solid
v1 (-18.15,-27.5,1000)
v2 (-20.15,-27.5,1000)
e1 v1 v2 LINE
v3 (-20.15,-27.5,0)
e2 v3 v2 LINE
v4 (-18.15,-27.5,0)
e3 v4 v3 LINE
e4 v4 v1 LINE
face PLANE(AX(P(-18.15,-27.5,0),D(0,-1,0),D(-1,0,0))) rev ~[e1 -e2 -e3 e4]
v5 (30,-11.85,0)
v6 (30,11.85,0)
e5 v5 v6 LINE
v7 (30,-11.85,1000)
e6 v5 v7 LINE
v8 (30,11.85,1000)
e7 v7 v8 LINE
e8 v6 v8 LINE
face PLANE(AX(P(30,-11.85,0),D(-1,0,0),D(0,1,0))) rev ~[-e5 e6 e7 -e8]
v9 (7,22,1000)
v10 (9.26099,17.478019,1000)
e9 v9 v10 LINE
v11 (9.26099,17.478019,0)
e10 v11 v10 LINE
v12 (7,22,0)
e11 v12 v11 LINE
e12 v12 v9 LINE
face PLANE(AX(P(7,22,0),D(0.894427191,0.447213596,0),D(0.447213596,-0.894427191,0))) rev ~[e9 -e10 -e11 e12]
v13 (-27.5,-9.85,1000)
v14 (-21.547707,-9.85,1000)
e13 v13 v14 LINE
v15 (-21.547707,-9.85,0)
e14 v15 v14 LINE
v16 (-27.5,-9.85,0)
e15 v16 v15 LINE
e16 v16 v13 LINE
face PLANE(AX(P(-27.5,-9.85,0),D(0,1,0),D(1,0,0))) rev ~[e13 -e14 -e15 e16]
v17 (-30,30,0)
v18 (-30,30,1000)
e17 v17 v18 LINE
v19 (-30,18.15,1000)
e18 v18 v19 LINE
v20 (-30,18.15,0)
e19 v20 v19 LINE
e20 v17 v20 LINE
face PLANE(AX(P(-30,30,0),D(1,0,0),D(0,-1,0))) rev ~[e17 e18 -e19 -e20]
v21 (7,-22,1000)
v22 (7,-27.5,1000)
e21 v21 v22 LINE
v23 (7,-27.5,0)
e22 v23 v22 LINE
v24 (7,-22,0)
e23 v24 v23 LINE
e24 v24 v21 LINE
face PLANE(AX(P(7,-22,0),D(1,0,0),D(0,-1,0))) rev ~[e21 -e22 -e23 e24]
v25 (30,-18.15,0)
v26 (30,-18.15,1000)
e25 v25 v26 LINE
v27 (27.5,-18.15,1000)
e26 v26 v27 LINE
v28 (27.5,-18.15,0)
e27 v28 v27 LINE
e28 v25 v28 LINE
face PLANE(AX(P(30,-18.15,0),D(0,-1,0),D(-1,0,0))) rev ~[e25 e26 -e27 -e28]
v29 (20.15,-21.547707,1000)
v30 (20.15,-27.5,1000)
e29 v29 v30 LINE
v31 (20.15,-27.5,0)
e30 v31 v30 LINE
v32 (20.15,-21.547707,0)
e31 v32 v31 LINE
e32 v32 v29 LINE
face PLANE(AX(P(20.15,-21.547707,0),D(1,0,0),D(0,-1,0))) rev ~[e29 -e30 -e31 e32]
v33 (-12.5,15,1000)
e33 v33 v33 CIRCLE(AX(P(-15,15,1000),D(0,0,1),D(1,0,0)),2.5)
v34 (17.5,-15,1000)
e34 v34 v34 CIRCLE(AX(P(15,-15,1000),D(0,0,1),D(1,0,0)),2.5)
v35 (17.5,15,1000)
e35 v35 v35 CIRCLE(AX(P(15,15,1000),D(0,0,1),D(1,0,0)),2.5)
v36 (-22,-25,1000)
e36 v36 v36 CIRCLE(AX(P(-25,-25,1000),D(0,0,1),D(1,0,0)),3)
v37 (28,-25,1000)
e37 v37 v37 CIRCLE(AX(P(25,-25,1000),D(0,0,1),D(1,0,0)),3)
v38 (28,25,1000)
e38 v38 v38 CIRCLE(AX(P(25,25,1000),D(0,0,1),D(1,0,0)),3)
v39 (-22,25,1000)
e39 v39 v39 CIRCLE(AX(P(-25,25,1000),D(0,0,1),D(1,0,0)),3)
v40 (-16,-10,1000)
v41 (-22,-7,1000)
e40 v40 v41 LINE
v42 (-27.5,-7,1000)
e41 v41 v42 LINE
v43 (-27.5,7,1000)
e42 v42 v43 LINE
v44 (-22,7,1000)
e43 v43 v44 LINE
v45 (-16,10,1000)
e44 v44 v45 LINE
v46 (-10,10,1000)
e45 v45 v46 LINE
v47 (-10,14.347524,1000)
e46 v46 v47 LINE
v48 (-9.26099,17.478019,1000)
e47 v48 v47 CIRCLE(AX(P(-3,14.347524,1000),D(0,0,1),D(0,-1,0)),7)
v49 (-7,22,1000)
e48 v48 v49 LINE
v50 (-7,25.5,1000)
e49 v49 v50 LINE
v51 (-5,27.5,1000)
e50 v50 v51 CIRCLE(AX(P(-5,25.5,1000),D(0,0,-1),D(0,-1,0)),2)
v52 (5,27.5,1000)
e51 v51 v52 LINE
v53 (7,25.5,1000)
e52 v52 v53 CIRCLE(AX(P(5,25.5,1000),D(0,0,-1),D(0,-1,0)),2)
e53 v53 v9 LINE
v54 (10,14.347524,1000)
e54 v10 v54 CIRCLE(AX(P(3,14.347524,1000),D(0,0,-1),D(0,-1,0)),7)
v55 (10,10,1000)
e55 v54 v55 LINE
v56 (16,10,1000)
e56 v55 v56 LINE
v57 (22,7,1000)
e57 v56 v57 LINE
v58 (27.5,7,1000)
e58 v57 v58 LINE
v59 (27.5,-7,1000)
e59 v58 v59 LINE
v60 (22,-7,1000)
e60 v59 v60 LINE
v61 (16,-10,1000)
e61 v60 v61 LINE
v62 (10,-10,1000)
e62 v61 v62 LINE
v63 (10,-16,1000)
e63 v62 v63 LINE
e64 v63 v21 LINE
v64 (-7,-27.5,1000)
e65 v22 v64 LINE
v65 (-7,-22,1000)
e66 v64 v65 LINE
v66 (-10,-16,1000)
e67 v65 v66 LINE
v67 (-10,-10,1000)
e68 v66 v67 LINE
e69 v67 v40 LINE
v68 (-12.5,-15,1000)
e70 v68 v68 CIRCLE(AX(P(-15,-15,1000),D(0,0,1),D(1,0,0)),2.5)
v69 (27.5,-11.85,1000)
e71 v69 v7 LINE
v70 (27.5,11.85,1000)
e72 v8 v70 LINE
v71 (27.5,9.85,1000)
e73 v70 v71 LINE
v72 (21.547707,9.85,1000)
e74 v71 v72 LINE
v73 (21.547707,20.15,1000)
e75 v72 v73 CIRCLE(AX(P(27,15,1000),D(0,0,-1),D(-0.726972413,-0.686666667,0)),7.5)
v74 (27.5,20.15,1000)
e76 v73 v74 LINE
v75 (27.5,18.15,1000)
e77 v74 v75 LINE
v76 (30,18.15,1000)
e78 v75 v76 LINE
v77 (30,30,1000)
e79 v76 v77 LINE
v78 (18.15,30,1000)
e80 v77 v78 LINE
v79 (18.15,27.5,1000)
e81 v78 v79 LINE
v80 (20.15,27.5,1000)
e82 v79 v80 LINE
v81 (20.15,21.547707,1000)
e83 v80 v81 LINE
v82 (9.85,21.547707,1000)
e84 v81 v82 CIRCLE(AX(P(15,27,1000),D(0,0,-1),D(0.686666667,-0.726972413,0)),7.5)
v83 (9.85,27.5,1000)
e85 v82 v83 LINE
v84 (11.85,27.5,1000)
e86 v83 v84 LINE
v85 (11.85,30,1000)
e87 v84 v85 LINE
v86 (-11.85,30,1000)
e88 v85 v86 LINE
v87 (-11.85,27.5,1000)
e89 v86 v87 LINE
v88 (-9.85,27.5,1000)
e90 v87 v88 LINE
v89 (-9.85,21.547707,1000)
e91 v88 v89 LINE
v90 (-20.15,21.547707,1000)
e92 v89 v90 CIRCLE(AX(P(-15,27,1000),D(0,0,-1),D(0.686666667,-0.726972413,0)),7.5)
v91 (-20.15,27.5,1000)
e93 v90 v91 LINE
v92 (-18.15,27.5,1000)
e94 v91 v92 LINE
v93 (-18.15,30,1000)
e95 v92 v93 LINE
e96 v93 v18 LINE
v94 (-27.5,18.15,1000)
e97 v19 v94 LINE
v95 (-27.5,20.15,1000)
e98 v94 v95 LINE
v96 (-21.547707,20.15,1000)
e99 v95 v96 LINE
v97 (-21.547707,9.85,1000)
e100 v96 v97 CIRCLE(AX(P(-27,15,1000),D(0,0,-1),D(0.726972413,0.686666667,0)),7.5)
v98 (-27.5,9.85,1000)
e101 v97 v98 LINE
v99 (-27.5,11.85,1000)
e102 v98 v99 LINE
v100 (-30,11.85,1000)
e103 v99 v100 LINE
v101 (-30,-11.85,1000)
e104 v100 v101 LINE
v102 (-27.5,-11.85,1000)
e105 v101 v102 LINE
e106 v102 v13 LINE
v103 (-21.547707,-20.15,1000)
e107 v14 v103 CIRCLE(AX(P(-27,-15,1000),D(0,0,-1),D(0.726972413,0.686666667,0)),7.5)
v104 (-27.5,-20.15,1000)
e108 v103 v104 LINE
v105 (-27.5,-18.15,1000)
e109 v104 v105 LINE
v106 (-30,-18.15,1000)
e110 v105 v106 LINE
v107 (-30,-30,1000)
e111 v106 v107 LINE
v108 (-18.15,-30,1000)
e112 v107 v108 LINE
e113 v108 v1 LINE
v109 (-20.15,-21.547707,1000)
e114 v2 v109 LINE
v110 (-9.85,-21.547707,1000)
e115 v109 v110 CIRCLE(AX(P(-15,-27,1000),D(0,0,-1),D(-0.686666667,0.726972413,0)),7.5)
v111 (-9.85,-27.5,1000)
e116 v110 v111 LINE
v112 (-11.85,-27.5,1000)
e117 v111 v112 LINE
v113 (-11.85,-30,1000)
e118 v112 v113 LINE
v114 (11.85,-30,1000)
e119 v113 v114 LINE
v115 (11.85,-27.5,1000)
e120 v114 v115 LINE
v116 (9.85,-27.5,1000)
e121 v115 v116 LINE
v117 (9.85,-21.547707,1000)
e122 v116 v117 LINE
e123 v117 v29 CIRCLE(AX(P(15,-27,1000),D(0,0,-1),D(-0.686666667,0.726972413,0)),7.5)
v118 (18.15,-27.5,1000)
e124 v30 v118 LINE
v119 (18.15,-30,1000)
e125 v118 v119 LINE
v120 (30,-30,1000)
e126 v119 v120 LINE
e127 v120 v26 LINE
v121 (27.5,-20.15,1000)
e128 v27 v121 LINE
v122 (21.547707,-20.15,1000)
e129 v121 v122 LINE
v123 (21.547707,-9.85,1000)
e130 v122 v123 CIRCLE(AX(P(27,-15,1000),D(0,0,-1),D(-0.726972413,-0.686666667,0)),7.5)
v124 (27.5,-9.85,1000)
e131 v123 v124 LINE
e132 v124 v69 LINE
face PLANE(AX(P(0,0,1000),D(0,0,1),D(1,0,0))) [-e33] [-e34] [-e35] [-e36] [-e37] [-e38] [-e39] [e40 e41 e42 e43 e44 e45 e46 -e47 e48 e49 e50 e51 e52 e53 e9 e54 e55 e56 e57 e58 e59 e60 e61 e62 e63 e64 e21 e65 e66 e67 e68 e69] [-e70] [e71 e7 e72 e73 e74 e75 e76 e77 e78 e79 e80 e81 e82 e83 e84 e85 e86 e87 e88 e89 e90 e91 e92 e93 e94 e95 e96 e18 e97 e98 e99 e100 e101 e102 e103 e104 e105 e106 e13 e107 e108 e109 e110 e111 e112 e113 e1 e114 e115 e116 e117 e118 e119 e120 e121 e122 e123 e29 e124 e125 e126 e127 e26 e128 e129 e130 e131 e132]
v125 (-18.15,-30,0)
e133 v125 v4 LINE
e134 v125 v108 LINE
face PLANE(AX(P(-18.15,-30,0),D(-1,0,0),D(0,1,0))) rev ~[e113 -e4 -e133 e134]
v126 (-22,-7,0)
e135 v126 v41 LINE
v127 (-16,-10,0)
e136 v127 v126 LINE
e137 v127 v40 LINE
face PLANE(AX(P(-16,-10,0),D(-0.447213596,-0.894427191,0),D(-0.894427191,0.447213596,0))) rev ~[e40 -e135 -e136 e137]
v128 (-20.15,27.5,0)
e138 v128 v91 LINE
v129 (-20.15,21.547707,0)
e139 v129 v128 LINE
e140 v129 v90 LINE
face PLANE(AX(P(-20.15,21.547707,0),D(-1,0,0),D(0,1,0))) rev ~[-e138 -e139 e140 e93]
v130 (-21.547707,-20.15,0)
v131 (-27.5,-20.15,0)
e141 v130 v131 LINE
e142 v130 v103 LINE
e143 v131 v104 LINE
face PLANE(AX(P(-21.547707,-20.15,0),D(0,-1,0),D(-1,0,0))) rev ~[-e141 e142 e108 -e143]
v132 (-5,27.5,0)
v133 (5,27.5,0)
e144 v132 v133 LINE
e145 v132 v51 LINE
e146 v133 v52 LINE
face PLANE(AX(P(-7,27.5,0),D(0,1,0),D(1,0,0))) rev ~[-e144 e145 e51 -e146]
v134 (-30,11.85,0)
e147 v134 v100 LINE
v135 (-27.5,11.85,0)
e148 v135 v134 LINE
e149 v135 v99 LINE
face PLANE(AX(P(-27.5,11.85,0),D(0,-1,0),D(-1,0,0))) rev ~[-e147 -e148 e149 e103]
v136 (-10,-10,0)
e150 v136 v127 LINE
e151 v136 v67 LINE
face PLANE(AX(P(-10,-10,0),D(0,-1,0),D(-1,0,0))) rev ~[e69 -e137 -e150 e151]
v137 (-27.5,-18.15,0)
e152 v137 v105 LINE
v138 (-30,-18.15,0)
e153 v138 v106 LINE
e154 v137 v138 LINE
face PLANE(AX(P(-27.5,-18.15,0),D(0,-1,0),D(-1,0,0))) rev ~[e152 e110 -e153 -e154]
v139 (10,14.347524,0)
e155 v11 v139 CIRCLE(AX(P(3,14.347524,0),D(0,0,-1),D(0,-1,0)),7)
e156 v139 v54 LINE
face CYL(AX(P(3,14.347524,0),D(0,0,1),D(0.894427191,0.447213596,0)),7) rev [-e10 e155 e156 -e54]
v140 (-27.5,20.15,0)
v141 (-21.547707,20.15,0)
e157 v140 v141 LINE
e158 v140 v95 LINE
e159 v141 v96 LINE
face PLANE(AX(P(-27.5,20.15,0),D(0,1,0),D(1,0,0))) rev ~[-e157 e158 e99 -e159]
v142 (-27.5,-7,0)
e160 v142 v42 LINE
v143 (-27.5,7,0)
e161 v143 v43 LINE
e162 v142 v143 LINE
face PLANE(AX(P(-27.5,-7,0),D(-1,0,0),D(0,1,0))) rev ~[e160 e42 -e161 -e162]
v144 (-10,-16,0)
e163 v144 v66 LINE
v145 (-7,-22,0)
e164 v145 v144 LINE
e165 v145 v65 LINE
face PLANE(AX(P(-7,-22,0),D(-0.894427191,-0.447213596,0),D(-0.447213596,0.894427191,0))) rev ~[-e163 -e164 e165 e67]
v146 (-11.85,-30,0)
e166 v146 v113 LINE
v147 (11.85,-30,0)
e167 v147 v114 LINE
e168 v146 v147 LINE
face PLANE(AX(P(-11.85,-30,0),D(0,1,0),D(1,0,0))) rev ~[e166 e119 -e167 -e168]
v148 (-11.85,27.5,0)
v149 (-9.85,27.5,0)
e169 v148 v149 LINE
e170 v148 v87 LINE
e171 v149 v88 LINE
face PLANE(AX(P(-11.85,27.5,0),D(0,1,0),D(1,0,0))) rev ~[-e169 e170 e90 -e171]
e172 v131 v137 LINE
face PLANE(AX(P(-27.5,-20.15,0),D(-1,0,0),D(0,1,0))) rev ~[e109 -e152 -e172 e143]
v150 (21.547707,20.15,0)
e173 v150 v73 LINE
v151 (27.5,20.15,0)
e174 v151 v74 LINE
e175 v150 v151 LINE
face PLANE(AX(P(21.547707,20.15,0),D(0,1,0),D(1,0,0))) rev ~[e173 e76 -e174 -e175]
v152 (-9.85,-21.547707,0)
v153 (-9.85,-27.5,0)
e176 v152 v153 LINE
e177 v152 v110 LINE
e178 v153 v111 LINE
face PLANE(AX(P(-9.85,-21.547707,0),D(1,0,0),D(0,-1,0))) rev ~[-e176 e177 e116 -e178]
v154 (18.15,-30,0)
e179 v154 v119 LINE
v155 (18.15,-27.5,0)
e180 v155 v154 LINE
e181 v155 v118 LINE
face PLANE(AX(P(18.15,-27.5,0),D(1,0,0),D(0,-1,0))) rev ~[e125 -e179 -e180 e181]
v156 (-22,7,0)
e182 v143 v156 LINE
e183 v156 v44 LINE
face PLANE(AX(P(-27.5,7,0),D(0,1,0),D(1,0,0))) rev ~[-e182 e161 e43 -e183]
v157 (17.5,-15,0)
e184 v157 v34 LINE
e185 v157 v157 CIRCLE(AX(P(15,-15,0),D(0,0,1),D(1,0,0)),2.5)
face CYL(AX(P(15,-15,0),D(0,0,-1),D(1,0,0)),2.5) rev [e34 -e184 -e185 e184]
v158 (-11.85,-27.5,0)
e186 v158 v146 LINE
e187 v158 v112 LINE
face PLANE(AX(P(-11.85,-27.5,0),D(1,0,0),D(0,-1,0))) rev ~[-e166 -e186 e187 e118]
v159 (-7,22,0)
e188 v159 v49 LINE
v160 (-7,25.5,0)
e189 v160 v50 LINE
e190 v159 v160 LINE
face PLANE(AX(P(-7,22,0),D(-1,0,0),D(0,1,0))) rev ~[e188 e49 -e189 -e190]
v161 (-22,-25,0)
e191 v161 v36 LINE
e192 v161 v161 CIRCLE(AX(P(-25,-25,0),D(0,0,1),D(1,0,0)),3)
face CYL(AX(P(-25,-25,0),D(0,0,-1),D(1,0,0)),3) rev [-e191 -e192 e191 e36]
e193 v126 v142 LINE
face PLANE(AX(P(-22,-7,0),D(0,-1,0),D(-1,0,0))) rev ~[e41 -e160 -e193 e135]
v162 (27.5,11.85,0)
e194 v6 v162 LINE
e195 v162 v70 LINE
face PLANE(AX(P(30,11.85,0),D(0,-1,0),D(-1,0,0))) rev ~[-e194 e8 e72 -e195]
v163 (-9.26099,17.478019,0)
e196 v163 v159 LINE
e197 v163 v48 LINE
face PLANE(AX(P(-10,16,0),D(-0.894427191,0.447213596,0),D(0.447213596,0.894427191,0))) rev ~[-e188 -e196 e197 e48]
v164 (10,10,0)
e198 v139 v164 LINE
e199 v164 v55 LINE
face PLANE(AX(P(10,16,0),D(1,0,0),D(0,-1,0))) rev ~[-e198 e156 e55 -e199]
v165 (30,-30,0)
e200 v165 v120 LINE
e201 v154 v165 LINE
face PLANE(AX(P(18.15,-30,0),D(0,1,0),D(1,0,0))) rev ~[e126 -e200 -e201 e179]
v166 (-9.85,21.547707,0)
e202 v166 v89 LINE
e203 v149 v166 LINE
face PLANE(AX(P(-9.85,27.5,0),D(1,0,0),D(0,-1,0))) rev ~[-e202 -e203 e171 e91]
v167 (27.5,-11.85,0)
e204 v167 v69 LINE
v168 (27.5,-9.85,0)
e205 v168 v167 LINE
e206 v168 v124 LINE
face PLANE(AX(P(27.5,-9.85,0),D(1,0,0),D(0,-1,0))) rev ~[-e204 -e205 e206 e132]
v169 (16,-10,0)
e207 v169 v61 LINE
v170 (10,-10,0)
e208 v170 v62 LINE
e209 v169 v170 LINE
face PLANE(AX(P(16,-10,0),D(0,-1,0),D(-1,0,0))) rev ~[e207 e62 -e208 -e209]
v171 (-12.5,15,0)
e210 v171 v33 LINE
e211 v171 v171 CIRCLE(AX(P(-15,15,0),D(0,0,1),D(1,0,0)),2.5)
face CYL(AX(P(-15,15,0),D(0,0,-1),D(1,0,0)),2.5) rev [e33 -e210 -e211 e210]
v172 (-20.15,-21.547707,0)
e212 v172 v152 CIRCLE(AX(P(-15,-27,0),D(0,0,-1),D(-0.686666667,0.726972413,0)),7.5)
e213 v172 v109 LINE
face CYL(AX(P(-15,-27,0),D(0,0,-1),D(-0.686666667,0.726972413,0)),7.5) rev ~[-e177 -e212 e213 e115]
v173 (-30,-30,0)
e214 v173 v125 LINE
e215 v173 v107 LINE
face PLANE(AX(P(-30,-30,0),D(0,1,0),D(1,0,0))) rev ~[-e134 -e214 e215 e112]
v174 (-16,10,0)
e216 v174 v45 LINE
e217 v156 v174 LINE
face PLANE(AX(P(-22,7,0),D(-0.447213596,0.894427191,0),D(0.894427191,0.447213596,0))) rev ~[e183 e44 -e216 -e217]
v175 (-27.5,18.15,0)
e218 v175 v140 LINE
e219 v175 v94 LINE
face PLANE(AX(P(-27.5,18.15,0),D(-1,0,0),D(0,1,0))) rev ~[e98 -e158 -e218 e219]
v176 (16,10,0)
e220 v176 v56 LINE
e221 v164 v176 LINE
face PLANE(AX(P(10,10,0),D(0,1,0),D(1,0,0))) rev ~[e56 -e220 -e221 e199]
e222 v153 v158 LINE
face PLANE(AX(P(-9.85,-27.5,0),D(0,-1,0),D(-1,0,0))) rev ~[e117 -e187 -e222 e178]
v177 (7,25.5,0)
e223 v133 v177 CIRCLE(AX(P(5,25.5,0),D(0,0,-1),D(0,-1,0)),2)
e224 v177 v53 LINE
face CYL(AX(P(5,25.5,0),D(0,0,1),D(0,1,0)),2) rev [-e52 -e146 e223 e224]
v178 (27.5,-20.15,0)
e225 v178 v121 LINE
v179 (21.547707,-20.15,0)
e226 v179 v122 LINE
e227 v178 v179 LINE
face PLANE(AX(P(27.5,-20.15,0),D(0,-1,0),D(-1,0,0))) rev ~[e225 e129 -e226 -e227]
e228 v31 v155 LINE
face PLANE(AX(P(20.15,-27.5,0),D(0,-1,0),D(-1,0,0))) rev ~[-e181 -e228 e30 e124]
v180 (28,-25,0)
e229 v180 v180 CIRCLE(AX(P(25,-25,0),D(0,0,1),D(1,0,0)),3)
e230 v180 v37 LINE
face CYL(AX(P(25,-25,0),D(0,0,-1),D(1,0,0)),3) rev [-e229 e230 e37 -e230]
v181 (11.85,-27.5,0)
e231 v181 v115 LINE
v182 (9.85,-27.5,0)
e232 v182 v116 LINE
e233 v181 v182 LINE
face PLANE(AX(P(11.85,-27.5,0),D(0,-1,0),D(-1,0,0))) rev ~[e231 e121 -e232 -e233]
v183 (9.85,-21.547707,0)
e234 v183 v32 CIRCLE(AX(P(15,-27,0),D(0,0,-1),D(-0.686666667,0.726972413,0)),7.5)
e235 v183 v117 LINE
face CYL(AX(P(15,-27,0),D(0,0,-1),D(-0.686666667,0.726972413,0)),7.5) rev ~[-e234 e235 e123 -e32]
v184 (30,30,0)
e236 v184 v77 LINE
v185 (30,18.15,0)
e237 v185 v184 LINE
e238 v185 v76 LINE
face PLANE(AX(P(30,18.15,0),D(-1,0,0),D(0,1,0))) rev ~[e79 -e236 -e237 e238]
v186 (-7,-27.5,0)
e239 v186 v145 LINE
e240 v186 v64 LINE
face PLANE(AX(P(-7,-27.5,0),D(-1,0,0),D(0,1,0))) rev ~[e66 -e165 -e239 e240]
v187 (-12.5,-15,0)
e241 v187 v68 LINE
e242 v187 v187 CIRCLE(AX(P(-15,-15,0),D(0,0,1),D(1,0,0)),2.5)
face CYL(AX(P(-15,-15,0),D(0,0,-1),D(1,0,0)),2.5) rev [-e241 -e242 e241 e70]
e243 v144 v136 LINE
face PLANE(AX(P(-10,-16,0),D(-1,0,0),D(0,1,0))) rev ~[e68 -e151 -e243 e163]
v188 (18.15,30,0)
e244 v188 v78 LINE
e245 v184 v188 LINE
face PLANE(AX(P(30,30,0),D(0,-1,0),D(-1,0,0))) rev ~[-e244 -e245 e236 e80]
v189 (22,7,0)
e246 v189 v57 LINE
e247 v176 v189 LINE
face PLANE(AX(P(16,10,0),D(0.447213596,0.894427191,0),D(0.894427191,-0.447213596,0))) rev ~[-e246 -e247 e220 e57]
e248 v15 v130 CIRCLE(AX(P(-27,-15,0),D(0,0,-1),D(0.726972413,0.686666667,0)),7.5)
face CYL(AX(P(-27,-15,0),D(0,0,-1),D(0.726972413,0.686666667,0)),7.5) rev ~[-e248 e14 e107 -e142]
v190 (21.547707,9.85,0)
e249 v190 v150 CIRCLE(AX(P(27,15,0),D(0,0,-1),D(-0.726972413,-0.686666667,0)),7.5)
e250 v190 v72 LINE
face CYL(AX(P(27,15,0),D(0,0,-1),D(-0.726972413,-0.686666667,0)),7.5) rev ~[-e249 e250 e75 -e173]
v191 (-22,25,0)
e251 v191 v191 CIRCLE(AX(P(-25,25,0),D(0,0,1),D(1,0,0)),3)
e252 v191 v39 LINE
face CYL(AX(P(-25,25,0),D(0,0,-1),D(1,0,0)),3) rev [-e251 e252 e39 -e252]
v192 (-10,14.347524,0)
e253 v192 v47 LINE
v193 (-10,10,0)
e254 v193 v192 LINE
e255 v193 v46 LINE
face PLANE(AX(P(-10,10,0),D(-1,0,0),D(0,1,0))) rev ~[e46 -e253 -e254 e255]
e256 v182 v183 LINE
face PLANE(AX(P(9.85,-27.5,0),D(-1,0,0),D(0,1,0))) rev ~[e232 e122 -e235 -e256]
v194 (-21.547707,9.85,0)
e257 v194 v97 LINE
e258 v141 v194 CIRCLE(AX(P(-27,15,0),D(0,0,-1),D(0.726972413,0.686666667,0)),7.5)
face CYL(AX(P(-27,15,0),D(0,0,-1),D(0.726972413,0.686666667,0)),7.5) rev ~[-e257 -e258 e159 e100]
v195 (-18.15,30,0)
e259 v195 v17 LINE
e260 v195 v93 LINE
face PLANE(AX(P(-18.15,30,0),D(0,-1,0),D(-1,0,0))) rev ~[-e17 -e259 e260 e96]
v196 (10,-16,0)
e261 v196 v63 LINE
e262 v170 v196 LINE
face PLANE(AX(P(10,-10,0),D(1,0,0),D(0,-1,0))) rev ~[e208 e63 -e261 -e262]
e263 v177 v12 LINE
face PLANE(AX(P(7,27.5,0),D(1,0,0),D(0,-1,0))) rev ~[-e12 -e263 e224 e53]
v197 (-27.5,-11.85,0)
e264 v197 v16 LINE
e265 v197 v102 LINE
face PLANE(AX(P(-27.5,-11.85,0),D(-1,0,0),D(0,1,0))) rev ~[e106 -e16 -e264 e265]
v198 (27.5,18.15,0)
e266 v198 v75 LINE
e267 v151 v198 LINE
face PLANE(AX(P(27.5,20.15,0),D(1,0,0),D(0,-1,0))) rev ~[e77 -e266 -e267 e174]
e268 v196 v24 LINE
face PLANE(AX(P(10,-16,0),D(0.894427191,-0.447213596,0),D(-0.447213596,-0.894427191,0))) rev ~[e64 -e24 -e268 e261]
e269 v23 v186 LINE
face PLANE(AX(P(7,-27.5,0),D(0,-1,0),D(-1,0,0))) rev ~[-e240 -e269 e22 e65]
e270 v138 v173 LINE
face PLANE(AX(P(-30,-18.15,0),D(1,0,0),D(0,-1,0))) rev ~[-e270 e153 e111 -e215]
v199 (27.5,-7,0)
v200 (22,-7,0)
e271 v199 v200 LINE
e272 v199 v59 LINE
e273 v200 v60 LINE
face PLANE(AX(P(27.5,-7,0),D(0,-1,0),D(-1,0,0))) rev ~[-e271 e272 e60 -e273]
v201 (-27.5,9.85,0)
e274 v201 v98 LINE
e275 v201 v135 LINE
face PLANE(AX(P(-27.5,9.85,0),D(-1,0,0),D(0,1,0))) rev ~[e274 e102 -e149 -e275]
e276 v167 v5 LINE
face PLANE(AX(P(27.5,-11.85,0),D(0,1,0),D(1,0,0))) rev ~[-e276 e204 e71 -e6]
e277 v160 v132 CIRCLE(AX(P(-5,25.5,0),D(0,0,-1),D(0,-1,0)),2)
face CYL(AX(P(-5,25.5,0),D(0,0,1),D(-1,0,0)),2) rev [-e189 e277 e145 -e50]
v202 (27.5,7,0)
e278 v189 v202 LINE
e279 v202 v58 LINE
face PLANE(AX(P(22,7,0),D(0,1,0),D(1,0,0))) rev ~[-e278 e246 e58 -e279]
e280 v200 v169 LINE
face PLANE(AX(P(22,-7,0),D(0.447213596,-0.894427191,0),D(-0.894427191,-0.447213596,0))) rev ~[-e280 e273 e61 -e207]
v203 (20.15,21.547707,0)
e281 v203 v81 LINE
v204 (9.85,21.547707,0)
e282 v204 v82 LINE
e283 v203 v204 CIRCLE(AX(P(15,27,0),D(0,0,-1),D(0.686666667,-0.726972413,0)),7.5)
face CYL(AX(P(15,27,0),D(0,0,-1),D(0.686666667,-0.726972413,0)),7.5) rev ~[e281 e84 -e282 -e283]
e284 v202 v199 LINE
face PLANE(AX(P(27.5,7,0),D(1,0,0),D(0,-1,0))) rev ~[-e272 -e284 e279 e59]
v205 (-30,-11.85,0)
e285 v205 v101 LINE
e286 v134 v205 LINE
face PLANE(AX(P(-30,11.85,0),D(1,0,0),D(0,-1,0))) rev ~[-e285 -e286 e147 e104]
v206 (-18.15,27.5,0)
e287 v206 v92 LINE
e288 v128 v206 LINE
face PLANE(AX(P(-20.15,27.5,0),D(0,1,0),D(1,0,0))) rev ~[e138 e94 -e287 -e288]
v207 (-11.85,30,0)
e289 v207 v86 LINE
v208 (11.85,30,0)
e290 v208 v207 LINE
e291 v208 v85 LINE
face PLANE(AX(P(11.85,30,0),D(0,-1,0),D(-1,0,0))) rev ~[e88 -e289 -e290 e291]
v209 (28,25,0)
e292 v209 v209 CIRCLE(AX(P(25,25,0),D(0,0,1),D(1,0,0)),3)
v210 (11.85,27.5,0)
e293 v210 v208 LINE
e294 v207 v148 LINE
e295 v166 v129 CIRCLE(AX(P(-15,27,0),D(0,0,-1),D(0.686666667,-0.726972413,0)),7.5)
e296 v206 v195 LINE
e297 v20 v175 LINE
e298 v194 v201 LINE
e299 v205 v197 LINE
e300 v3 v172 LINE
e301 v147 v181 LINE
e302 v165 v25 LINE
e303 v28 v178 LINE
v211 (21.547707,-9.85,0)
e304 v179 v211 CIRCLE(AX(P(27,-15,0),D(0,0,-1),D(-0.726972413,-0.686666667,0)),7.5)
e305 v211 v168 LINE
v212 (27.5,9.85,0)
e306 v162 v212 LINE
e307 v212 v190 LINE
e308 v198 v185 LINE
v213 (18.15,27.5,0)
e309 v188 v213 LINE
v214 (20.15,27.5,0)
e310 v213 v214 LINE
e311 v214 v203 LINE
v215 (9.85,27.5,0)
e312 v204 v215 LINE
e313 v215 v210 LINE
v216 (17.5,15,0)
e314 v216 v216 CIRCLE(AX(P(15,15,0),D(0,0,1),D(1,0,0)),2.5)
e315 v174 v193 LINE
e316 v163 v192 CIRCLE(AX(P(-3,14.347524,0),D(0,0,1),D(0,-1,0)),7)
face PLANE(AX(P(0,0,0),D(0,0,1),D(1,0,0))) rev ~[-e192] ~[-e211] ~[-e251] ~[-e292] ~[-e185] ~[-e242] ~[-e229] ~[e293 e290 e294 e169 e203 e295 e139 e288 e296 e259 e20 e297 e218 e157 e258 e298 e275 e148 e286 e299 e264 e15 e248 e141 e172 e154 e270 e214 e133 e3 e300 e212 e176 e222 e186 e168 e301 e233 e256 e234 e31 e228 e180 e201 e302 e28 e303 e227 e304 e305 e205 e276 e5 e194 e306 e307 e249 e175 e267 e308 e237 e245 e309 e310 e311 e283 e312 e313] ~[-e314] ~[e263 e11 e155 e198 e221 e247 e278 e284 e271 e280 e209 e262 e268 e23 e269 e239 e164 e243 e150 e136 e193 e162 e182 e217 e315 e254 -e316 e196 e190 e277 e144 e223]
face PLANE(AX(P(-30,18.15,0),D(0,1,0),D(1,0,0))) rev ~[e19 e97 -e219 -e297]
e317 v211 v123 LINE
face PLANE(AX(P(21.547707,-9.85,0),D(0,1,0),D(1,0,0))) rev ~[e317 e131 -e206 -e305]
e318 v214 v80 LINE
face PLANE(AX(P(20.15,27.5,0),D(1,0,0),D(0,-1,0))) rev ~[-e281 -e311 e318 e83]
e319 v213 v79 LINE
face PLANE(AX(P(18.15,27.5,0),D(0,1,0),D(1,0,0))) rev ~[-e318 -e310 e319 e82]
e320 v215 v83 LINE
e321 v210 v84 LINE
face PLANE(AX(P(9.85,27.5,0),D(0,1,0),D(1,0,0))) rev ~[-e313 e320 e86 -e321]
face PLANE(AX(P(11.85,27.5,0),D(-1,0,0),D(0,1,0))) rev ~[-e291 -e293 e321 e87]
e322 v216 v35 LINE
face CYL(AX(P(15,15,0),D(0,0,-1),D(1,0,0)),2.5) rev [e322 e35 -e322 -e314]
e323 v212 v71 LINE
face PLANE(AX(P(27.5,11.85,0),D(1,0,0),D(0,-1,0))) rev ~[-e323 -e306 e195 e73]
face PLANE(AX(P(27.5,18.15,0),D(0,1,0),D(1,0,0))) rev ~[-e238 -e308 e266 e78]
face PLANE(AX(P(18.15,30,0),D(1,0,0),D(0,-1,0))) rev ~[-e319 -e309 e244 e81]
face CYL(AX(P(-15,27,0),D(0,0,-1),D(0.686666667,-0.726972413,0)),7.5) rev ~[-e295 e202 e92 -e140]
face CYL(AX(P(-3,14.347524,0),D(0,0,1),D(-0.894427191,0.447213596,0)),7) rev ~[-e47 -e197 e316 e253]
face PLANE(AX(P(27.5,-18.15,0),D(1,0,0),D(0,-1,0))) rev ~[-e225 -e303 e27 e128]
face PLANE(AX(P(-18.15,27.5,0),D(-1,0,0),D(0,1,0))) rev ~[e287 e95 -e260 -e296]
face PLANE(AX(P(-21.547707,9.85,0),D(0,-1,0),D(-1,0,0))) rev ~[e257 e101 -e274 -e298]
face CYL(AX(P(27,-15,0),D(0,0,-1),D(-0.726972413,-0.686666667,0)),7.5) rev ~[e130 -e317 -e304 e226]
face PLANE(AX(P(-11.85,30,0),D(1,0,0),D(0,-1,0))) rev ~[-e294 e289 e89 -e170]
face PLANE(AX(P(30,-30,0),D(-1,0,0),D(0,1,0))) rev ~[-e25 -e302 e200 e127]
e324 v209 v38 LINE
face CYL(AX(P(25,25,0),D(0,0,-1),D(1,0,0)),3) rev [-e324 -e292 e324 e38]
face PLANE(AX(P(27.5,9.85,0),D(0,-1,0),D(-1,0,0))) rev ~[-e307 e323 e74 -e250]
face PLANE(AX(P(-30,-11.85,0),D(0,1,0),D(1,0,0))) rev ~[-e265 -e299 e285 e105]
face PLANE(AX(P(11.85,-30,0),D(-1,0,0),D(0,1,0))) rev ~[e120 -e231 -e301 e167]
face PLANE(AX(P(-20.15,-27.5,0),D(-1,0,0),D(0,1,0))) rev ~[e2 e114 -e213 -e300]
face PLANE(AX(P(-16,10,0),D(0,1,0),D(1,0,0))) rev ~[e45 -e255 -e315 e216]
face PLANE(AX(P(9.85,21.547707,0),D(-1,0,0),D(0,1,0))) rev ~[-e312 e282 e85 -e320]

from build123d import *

# Parameters (mm, degrees)
F0_R     = 3
F0_R_2   = 2.5
F1_DEPTH = 1000
F2_R     = 2
F3_R     = 7


# Not quite as in the source:
# - a feature names something its author has since deleted; it is built from what else it names


with BuildPart() as f1:
    # F0 (on Top) → F1 (new body)
    with BuildSketch(Plane.XY):
        with BuildLine():
            Line((18.15, -30), (30, -30))
            Line((30, -30), (30, -18.15))
            Line((30, -18.15), (27.5, -18.15))
            Line((27.5, -18.15), (27.5, -20.15))
            Line((27.5, -20.15), (21.5477069044, -20.15))
            ThreePointArc((21.5477069044, -20.15), (19.5, -15), (21.5477069044, -9.85))
            Line((21.5477069044, -9.85), (27.5, -9.85))
            Line((27.5, -9.85), (27.5, -11.85))
            Line((27.5, -11.85), (30, -11.85))
            Line((30, -11.85), (30, 11.85))
            Line((30, 11.85), (27.5, 11.85))
            Line((27.5, 11.85), (27.5, 9.85))
            Line((27.5, 9.85), (21.5477069044, 9.85))
            ThreePointArc((21.5477069044, 9.85), (19.5, 15), (21.5477069044, 20.15))
            Line((21.5477069044, 20.15), (27.5, 20.15))
            Line((27.5, 20.15), (27.5, 18.15))
            Line((27.5, 18.15), (30, 18.15))
            Line((30, 18.15), (30, 30))
            Line((30, 30), (18.15, 30))
            Line((18.15, 30), (18.15, 27.5))
            Line((18.15, 27.5), (20.15, 27.5))
            Line((20.15, 27.5), (20.15, 21.5477069044))
            ThreePointArc((20.15, 21.5477069044), (15, 19.5), (9.85, 21.5477069044))
            Line((9.85, 21.5477069044), (9.85, 27.5))
            Line((9.85, 27.5), (11.85, 27.5))
            Line((11.85, 27.5), (11.85, 30))
            Line((11.85, 30), (-11.85, 30))
            Line((-11.85, 30), (-11.85, 27.5))
            Line((-11.85, 27.5), (-9.85, 27.5))
            Line((-9.85, 27.5), (-9.85, 21.5477069044))
            ThreePointArc((-9.85, 21.5477069044), (-15, 19.5), (-20.15, 21.5477069044))
            Line((-20.15, 21.5477069044), (-20.15, 27.5))
            Line((-20.15, 27.5), (-18.15, 27.5))
            Line((-18.15, 27.5), (-18.15, 30))
            Line((-18.15, 30), (-30, 30))
            Line((-30, 30), (-30, 18.15))
            Line((-30, 18.15), (-27.5, 18.15))
            Line((-27.5, 18.15), (-27.5, 20.15))
            Line((-27.5, 20.15), (-21.5477069044, 20.15))
            ThreePointArc((-21.5477069044, 20.15), (-19.5, 15), (-21.5477069044, 9.85))
            Line((-21.5477069044, 9.85), (-27.5, 9.85))
            Line((-27.5, 9.85), (-27.5, 11.85))
            Line((-27.5, 11.85), (-30, 11.85))
            Line((-30, 11.85), (-30, -11.85))
            Line((-30, -11.85), (-27.5, -11.85))
            Line((-27.5, -11.85), (-27.5, -9.85))
            Line((-27.5, -9.85), (-21.5477069044, -9.85))
            ThreePointArc((-21.5477069044, -9.85), (-19.5, -15), (-21.5477069044, -20.15))
            Line((-21.5477069044, -20.15), (-27.5, -20.15))
            Line((-27.5, -20.15), (-27.5, -18.15))
            Line((-27.5, -18.15), (-30, -18.15))
            Line((-30, -18.15), (-30, -30))
            Line((-30, -30), (-18.15, -30))
            Line((-18.15, -30), (-18.15, -27.5))
            Line((-18.15, -27.5), (-20.15, -27.5))
            Line((-20.15, -27.5), (-20.15, -21.5477069044))
            ThreePointArc((-20.15, -21.5477069044), (-15, -19.5), (-9.85, -21.5477069044))
            Line((-9.85, -21.5477069044), (-9.85, -27.5))
            Line((-9.85, -27.5), (-11.85, -27.5))
            Line((-11.85, -27.5), (-11.85, -30))
            Line((-11.85, -30), (11.85, -30))
            Line((11.85, -30), (11.85, -27.5))
            Line((11.85, -27.5), (9.85, -27.5))
            Line((9.85, -27.5), (9.85, -21.5477069044))
            ThreePointArc((9.85, -21.5477069044), (15, -19.5), (20.15, -21.5477069044))
            Line((20.15, -21.5477069044), (20.15, -27.5))
            Line((20.15, -27.5), (18.15, -27.5))
            Line((18.15, -27.5), (18.15, -30))
        make_face()
        with Locations((-25, -25)):
            Circle(F0_R, mode=Mode.SUBTRACT)
        with Locations((-15, -15)):
            Circle(F0_R_2, mode=Mode.SUBTRACT)
        with Locations((25, -25)):
            Circle(F0_R, mode=Mode.SUBTRACT)
        with Locations((15, -15)):
            Circle(F0_R_2, mode=Mode.SUBTRACT)
        with Locations((-25, 25)):
            Circle(F0_R, mode=Mode.SUBTRACT)
        with Locations((-15, 15)):
            Circle(F0_R_2, mode=Mode.SUBTRACT)
        Polygon((-7, 22), (-7, 27.5), (0, 27.5), (7, 27.5), (7, 22), (10, 16), (10, 10), (16, 10), (22, 7), (27.5, 7), (27.5, 0), (27.5, -7), (22, -7), (16, -10), (10, -10), (10, -16), (7, -22), (7, -27.5), (0, -27.5), (-7, -27.5), (-7, -22), (-10, -16), (-10, -10), (-16, -10), (-22, -7), (-27.5, -7), (-27.5, 0), (-27.5, 7), (-22, 7), (-16, 10), (-10, 10), (-10, 16), align=None, mode=Mode.SUBTRACT)
        with Locations((15, 15)):
            Circle(F0_R_2, mode=Mode.SUBTRACT)
        with Locations((25, 25)):
            Circle(F0_R, mode=Mode.SUBTRACT)
    extrude(amount=F1_DEPTH)

    # F2
    f2_edges = [f1.edges().sort_by_distance(p)[0] for p in [
        (-7, 27.5, 500),
        (7, 27.5, 500),
    ]]
    fillet(f2_edges, radius=F2_R)

    # F3
    f3_edges = [f1.edges().sort_by_distance(p)[0] for p in [
        (-10, 16, 500),
        (10, 16, 500),
    ]]
    fillet(f3_edges, radius=F3_R)


solid = f1.part
